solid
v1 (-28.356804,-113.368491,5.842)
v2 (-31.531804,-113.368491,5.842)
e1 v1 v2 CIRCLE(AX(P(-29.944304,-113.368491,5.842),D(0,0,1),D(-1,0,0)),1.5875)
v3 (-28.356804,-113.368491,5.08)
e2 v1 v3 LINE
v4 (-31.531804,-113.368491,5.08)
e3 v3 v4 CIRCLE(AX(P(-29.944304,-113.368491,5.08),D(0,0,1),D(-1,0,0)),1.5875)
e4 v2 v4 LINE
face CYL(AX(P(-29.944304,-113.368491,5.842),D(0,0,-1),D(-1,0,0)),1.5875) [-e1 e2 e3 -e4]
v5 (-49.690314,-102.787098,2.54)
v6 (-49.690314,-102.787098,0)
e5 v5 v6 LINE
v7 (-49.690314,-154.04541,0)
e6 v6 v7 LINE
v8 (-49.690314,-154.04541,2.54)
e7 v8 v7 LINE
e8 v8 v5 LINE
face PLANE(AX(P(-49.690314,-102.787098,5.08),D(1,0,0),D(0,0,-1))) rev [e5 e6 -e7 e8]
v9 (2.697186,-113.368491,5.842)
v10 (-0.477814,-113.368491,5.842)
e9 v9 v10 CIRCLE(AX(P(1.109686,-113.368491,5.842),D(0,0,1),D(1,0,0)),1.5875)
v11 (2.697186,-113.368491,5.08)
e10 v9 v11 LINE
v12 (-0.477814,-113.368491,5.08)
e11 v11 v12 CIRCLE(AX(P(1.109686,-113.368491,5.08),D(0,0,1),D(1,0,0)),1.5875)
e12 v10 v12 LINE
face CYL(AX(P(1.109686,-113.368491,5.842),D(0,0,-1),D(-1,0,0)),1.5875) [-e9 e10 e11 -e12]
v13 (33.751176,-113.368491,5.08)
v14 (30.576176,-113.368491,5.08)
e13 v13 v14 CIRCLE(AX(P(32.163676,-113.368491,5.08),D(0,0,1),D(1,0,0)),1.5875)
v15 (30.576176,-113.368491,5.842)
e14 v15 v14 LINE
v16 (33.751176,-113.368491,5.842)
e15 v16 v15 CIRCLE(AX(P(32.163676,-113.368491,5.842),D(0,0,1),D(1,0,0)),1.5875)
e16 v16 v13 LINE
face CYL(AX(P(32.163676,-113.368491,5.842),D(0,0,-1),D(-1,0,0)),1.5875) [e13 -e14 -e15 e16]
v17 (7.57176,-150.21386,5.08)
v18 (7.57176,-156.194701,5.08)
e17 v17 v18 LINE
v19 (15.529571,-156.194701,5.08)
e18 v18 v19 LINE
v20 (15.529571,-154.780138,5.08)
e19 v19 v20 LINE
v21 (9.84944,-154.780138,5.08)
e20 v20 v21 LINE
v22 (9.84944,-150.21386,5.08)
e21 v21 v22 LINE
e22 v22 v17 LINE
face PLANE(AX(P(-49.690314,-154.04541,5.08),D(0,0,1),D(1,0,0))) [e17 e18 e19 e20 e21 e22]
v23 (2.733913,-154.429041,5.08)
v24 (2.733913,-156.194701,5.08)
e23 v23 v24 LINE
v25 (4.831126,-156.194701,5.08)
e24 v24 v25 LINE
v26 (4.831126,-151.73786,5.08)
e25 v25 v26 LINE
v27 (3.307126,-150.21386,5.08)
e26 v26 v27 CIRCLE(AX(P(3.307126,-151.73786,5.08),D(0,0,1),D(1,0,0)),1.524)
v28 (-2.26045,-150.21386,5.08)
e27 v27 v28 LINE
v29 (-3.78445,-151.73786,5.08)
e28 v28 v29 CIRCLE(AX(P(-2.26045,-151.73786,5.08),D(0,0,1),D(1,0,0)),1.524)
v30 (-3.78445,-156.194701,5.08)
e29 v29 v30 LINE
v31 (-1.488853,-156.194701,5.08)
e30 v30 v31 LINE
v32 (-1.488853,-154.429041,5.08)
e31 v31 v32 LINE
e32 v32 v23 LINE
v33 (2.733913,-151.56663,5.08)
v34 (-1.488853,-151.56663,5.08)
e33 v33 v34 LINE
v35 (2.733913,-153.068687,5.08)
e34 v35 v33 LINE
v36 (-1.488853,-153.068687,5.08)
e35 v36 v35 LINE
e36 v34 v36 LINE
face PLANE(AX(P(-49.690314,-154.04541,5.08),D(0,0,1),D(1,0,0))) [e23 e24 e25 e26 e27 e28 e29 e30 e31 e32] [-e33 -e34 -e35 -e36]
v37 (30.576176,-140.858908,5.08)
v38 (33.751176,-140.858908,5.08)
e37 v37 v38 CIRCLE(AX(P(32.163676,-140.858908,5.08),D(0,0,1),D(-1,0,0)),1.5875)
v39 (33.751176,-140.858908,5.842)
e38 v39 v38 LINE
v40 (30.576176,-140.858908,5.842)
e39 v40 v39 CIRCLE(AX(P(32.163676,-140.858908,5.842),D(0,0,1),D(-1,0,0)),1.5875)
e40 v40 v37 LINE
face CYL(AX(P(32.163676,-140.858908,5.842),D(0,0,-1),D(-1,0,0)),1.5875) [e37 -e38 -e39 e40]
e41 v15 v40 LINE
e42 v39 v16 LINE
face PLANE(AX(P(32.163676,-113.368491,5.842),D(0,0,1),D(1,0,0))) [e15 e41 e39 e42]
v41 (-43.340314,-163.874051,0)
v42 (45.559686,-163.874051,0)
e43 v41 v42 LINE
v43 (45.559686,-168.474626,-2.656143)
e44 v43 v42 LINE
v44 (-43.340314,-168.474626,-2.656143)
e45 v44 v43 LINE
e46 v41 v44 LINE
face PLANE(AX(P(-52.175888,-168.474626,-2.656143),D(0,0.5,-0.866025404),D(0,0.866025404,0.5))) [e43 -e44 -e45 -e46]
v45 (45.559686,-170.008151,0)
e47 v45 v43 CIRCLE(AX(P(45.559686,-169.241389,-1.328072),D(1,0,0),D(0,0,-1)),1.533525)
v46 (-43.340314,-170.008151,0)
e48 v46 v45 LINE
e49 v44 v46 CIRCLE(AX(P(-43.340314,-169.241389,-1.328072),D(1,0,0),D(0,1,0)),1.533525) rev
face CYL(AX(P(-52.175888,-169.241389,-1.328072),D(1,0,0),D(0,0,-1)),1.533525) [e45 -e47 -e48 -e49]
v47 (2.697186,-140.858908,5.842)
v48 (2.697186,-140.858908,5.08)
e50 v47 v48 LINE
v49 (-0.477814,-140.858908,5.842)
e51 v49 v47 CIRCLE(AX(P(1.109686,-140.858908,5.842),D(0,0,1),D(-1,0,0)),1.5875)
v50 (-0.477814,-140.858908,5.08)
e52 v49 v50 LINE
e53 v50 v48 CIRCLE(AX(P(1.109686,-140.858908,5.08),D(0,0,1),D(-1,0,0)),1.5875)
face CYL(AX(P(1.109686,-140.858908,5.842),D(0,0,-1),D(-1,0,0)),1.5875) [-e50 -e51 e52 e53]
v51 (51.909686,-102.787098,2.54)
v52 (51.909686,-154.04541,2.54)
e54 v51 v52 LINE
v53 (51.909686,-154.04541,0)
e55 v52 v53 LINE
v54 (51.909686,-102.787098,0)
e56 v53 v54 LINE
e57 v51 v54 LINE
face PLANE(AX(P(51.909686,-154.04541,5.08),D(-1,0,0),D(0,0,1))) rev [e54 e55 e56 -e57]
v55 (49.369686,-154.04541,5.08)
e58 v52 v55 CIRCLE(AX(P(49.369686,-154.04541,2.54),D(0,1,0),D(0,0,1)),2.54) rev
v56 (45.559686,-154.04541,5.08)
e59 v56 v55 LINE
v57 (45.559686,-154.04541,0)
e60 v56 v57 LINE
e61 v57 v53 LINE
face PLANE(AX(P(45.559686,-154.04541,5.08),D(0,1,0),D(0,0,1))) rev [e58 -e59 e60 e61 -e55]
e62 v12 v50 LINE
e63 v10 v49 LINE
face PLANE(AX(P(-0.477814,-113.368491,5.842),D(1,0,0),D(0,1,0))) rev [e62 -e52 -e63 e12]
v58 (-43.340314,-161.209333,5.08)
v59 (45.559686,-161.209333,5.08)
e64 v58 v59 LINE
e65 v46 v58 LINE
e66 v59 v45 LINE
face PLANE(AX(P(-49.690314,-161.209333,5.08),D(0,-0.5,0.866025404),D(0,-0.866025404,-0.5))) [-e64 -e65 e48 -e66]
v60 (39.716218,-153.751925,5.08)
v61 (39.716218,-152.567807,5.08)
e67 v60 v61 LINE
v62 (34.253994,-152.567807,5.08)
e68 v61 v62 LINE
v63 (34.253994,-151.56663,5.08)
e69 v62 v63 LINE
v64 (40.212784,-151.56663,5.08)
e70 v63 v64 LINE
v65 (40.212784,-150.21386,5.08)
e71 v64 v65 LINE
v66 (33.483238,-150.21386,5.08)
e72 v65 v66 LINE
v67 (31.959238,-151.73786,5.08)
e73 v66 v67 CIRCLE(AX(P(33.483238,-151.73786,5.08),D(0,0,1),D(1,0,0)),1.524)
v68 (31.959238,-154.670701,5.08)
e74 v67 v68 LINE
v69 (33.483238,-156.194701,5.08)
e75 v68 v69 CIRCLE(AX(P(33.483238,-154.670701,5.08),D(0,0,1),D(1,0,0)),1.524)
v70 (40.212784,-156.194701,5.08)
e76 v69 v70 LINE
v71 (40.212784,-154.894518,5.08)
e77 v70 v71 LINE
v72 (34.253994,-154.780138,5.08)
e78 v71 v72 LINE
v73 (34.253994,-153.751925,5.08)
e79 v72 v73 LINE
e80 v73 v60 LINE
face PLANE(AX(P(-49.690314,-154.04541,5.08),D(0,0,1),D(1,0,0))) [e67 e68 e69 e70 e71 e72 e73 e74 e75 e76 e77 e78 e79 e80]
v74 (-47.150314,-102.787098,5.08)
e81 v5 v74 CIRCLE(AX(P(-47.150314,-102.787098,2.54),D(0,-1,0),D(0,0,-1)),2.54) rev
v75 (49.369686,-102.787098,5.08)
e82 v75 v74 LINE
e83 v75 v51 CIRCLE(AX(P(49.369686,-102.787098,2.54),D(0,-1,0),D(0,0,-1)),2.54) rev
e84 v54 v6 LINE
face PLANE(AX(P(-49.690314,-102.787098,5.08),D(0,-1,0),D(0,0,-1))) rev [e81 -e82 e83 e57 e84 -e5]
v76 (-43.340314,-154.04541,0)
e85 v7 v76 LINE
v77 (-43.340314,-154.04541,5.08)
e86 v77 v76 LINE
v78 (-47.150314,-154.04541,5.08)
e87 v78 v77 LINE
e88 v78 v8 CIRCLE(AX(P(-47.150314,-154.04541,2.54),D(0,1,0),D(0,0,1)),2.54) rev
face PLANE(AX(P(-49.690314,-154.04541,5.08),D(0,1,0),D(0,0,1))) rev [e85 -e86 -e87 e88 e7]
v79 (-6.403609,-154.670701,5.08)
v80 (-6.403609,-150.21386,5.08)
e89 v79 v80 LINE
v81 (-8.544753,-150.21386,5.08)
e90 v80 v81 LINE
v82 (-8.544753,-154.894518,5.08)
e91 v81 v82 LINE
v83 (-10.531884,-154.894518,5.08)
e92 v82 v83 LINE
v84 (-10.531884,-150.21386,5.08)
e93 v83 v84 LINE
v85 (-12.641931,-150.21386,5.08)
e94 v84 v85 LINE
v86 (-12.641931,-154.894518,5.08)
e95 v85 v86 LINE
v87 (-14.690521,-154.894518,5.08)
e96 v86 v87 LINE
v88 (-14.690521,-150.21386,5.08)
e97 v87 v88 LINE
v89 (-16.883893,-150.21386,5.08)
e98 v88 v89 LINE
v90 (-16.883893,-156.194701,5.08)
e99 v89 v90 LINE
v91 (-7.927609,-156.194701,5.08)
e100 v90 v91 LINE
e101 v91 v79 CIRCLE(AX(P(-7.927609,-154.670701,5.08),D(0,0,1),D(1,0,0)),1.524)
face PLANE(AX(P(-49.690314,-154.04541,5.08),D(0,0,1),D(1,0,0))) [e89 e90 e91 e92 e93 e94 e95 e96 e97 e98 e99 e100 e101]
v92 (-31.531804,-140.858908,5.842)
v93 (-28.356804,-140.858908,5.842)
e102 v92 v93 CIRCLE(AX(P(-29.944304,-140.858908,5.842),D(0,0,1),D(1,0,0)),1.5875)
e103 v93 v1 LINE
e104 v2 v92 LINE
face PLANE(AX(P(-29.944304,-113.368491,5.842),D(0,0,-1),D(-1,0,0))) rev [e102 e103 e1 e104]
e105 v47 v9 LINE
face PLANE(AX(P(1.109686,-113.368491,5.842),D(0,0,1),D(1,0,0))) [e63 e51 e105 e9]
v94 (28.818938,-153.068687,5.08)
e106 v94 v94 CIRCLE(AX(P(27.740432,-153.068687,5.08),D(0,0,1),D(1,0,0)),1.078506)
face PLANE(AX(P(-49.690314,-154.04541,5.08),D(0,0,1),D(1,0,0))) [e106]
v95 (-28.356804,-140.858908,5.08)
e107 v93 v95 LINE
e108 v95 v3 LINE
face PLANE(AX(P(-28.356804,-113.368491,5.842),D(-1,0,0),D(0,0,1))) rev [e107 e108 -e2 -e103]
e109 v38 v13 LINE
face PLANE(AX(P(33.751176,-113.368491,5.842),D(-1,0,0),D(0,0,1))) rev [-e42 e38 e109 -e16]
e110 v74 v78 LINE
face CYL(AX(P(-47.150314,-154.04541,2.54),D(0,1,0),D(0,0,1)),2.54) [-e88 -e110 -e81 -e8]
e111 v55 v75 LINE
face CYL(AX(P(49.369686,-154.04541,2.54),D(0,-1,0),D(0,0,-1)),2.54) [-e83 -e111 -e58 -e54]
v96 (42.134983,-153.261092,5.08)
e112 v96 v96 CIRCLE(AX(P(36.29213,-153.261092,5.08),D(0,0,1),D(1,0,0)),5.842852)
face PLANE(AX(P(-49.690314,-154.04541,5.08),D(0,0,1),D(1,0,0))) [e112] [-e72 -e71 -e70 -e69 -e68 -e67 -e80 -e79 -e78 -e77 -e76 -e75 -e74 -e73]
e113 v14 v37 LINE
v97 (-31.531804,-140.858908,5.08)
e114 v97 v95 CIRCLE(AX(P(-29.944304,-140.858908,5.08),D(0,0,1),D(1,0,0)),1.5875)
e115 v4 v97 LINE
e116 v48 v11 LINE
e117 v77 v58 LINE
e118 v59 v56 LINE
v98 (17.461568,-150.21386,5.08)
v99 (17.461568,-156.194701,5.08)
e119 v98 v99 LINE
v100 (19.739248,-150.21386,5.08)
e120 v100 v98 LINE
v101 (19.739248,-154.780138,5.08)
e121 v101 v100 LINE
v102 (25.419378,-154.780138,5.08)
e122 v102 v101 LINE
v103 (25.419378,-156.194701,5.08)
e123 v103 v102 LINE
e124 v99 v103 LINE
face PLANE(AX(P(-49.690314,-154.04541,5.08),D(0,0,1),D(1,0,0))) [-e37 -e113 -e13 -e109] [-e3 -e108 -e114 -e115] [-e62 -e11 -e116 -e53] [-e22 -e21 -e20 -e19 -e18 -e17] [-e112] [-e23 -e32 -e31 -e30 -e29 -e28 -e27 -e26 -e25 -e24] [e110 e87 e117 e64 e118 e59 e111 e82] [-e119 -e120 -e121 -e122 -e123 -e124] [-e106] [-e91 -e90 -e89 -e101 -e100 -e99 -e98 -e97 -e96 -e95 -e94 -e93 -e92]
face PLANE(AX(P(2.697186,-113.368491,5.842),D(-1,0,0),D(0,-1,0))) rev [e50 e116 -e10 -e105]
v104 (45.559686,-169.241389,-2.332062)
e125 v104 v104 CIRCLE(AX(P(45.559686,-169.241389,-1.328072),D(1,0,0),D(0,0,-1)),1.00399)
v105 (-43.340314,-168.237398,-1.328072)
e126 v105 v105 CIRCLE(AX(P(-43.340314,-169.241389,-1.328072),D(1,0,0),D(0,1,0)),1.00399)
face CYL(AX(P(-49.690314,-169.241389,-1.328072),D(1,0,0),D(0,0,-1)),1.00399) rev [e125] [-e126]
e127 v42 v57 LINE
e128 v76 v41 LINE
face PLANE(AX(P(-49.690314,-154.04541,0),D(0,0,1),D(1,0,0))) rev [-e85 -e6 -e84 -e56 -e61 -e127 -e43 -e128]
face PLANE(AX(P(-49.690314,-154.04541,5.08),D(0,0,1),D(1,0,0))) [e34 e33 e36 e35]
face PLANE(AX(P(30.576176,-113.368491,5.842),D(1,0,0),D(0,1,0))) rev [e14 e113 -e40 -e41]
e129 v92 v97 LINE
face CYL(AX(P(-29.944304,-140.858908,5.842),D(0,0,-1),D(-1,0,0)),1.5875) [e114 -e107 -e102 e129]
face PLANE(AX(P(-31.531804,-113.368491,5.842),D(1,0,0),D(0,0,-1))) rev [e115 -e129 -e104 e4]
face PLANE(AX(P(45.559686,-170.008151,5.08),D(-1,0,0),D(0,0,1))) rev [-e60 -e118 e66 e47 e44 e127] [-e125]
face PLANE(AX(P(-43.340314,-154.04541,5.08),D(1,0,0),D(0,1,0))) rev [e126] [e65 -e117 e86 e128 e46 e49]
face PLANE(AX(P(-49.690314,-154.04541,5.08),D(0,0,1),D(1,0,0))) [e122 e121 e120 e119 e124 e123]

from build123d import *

# Parameters (mm, degrees)
EXTRUDE1_DEPTH = 5.08
FILLET1_R      = 2.54
CHAMFER1_SIZE2 = 5.08
CHAMFER1_SIZE  = 8.798818102
EXTRUDE3_DEPTH = 88.9
SKETCH2_R      = 1.003990475
EXTRUDE2_DEPTH = 196.607873206
EXTRUDE4_DEPTH = 0.762


with BuildPart() as part:
    # Sketch1 → Extrude1 (new body)
    with BuildSketch(Plane.XY):
        Polygon((-49.690313901, -102.787097767), (51.909686099, -102.787097767), (51.909686099, -154.045409896), (45.559686099, -154.045409896), (45.559686099, -170.008151162), (-43.340313901, -170.008151162), (-43.340313901, -154.045409896), (-49.690313901, -154.045409896), align=None)
    extrude(amount=EXTRUDE1_DEPTH)

    # Fillet1
    fillet1_edges = [part.edges().sort_by_distance(p)[0] for p in [
        (51.909686099, -128.416253832, 5.08),
        (-49.690313901, -128.416253832, 5.08),
    ]]
    fillet(fillet1_edges, radius=FILLET1_R)

    # Chamfer1
    chamfer1_edges = [part.edges().sort_by_distance(p)[0] for p in [
        (1.109686099, -170.008151162, 5.08),
    ]]
    chamfer1_side = [part.faces().sort_by_distance(p)[0] for p in [
        (1.109686099, -169.906551162, 5.08),
    ]]
    chamfer(chamfer1_edges, length=CHAMFER1_SIZE - 0.0001, length2=CHAMFER1_SIZE2 - 0.0001, reference=chamfer1_side[0])  # a hair under: the kernel refuses the full size

    # Sketch3 → Extrude3 (add)
    with BuildSketch(Plane(origin=(45.559686099, 0, 0), x_dir=(0, 0, -1), z_dir=(1, 0, 0))):
        with BuildLine():
            Line((-2.656143456, -165.407575745), (0, -170.008151162))
            ThreePointArc((0, -170.008151162), (2.094834297, -170.56946032), (2.656143456, -168.474626023))
            Line((2.656143456, -168.474626023), (0, -163.874050605))
            Line((0, -163.874050605), (-2.656143456, -165.407575745))
        make_face()
    extrude(amount=-EXTRUDE3_DEPTH)

    # Sketch2 → Extrude2 (cut, through all)
    with BuildSketch(Plane(origin=(45.559686099, 0, 0), x_dir=(0, 0, -1), z_dir=(1, 0, 0))):
        with Locations((1.328071728, -169.241388592)):
            Circle(SKETCH2_R)
    extrude(amount=-EXTRUDE2_DEPTH, mode=Mode.SUBTRACT)

    # Sketch4 → Extrude4 (add)
    with BuildSketch(Plane.XY.offset(5.08)):
        with BuildLine():
            Line((2.697186099, -113.368491021), (2.697186099, -140.858908158))
            ThreePointArc((2.697186099, -140.858908158), (1.109686099, -142.446408158), (-0.477813901, -140.858908158))
            Line((-0.477813901, -140.858908158), (-0.477813901, -113.368491021))
            ThreePointArc((-0.477813901, -113.368491021), (1.109686099, -111.780991021), (2.697186099, -113.368491021))
        make_face()
        with BuildLine():
            Line((-31.531803629, -113.368491021), (-31.531803629, -140.858908158))
            ThreePointArc((-31.531803629, -140.858908158), (-29.944303629, -142.446408158), (-28.356803629, -140.858908158))
            Line((-28.356803629, -140.858908158), (-28.356803629, -113.368491021))
            ThreePointArc((-28.356803629, -113.368491021), (-29.944303629, -111.780991021), (-31.531803629, -113.368491021))
        make_face()
        with BuildLine():
            Line((33.751175827, -113.368491021), (33.751175827, -140.858908158))
            ThreePointArc((33.751175827, -140.858908158), (32.163675827, -142.446408158), (30.576175827, -140.858908158))
            Line((30.576175827, -140.858908158), (30.576175827, -113.368491021))
            ThreePointArc((30.576175827, -113.368491021), (32.163675827, -111.780991021), (33.751175827, -113.368491021))
        make_face()
    extrude(amount=EXTRUDE4_DEPTH)


solid = part.part
